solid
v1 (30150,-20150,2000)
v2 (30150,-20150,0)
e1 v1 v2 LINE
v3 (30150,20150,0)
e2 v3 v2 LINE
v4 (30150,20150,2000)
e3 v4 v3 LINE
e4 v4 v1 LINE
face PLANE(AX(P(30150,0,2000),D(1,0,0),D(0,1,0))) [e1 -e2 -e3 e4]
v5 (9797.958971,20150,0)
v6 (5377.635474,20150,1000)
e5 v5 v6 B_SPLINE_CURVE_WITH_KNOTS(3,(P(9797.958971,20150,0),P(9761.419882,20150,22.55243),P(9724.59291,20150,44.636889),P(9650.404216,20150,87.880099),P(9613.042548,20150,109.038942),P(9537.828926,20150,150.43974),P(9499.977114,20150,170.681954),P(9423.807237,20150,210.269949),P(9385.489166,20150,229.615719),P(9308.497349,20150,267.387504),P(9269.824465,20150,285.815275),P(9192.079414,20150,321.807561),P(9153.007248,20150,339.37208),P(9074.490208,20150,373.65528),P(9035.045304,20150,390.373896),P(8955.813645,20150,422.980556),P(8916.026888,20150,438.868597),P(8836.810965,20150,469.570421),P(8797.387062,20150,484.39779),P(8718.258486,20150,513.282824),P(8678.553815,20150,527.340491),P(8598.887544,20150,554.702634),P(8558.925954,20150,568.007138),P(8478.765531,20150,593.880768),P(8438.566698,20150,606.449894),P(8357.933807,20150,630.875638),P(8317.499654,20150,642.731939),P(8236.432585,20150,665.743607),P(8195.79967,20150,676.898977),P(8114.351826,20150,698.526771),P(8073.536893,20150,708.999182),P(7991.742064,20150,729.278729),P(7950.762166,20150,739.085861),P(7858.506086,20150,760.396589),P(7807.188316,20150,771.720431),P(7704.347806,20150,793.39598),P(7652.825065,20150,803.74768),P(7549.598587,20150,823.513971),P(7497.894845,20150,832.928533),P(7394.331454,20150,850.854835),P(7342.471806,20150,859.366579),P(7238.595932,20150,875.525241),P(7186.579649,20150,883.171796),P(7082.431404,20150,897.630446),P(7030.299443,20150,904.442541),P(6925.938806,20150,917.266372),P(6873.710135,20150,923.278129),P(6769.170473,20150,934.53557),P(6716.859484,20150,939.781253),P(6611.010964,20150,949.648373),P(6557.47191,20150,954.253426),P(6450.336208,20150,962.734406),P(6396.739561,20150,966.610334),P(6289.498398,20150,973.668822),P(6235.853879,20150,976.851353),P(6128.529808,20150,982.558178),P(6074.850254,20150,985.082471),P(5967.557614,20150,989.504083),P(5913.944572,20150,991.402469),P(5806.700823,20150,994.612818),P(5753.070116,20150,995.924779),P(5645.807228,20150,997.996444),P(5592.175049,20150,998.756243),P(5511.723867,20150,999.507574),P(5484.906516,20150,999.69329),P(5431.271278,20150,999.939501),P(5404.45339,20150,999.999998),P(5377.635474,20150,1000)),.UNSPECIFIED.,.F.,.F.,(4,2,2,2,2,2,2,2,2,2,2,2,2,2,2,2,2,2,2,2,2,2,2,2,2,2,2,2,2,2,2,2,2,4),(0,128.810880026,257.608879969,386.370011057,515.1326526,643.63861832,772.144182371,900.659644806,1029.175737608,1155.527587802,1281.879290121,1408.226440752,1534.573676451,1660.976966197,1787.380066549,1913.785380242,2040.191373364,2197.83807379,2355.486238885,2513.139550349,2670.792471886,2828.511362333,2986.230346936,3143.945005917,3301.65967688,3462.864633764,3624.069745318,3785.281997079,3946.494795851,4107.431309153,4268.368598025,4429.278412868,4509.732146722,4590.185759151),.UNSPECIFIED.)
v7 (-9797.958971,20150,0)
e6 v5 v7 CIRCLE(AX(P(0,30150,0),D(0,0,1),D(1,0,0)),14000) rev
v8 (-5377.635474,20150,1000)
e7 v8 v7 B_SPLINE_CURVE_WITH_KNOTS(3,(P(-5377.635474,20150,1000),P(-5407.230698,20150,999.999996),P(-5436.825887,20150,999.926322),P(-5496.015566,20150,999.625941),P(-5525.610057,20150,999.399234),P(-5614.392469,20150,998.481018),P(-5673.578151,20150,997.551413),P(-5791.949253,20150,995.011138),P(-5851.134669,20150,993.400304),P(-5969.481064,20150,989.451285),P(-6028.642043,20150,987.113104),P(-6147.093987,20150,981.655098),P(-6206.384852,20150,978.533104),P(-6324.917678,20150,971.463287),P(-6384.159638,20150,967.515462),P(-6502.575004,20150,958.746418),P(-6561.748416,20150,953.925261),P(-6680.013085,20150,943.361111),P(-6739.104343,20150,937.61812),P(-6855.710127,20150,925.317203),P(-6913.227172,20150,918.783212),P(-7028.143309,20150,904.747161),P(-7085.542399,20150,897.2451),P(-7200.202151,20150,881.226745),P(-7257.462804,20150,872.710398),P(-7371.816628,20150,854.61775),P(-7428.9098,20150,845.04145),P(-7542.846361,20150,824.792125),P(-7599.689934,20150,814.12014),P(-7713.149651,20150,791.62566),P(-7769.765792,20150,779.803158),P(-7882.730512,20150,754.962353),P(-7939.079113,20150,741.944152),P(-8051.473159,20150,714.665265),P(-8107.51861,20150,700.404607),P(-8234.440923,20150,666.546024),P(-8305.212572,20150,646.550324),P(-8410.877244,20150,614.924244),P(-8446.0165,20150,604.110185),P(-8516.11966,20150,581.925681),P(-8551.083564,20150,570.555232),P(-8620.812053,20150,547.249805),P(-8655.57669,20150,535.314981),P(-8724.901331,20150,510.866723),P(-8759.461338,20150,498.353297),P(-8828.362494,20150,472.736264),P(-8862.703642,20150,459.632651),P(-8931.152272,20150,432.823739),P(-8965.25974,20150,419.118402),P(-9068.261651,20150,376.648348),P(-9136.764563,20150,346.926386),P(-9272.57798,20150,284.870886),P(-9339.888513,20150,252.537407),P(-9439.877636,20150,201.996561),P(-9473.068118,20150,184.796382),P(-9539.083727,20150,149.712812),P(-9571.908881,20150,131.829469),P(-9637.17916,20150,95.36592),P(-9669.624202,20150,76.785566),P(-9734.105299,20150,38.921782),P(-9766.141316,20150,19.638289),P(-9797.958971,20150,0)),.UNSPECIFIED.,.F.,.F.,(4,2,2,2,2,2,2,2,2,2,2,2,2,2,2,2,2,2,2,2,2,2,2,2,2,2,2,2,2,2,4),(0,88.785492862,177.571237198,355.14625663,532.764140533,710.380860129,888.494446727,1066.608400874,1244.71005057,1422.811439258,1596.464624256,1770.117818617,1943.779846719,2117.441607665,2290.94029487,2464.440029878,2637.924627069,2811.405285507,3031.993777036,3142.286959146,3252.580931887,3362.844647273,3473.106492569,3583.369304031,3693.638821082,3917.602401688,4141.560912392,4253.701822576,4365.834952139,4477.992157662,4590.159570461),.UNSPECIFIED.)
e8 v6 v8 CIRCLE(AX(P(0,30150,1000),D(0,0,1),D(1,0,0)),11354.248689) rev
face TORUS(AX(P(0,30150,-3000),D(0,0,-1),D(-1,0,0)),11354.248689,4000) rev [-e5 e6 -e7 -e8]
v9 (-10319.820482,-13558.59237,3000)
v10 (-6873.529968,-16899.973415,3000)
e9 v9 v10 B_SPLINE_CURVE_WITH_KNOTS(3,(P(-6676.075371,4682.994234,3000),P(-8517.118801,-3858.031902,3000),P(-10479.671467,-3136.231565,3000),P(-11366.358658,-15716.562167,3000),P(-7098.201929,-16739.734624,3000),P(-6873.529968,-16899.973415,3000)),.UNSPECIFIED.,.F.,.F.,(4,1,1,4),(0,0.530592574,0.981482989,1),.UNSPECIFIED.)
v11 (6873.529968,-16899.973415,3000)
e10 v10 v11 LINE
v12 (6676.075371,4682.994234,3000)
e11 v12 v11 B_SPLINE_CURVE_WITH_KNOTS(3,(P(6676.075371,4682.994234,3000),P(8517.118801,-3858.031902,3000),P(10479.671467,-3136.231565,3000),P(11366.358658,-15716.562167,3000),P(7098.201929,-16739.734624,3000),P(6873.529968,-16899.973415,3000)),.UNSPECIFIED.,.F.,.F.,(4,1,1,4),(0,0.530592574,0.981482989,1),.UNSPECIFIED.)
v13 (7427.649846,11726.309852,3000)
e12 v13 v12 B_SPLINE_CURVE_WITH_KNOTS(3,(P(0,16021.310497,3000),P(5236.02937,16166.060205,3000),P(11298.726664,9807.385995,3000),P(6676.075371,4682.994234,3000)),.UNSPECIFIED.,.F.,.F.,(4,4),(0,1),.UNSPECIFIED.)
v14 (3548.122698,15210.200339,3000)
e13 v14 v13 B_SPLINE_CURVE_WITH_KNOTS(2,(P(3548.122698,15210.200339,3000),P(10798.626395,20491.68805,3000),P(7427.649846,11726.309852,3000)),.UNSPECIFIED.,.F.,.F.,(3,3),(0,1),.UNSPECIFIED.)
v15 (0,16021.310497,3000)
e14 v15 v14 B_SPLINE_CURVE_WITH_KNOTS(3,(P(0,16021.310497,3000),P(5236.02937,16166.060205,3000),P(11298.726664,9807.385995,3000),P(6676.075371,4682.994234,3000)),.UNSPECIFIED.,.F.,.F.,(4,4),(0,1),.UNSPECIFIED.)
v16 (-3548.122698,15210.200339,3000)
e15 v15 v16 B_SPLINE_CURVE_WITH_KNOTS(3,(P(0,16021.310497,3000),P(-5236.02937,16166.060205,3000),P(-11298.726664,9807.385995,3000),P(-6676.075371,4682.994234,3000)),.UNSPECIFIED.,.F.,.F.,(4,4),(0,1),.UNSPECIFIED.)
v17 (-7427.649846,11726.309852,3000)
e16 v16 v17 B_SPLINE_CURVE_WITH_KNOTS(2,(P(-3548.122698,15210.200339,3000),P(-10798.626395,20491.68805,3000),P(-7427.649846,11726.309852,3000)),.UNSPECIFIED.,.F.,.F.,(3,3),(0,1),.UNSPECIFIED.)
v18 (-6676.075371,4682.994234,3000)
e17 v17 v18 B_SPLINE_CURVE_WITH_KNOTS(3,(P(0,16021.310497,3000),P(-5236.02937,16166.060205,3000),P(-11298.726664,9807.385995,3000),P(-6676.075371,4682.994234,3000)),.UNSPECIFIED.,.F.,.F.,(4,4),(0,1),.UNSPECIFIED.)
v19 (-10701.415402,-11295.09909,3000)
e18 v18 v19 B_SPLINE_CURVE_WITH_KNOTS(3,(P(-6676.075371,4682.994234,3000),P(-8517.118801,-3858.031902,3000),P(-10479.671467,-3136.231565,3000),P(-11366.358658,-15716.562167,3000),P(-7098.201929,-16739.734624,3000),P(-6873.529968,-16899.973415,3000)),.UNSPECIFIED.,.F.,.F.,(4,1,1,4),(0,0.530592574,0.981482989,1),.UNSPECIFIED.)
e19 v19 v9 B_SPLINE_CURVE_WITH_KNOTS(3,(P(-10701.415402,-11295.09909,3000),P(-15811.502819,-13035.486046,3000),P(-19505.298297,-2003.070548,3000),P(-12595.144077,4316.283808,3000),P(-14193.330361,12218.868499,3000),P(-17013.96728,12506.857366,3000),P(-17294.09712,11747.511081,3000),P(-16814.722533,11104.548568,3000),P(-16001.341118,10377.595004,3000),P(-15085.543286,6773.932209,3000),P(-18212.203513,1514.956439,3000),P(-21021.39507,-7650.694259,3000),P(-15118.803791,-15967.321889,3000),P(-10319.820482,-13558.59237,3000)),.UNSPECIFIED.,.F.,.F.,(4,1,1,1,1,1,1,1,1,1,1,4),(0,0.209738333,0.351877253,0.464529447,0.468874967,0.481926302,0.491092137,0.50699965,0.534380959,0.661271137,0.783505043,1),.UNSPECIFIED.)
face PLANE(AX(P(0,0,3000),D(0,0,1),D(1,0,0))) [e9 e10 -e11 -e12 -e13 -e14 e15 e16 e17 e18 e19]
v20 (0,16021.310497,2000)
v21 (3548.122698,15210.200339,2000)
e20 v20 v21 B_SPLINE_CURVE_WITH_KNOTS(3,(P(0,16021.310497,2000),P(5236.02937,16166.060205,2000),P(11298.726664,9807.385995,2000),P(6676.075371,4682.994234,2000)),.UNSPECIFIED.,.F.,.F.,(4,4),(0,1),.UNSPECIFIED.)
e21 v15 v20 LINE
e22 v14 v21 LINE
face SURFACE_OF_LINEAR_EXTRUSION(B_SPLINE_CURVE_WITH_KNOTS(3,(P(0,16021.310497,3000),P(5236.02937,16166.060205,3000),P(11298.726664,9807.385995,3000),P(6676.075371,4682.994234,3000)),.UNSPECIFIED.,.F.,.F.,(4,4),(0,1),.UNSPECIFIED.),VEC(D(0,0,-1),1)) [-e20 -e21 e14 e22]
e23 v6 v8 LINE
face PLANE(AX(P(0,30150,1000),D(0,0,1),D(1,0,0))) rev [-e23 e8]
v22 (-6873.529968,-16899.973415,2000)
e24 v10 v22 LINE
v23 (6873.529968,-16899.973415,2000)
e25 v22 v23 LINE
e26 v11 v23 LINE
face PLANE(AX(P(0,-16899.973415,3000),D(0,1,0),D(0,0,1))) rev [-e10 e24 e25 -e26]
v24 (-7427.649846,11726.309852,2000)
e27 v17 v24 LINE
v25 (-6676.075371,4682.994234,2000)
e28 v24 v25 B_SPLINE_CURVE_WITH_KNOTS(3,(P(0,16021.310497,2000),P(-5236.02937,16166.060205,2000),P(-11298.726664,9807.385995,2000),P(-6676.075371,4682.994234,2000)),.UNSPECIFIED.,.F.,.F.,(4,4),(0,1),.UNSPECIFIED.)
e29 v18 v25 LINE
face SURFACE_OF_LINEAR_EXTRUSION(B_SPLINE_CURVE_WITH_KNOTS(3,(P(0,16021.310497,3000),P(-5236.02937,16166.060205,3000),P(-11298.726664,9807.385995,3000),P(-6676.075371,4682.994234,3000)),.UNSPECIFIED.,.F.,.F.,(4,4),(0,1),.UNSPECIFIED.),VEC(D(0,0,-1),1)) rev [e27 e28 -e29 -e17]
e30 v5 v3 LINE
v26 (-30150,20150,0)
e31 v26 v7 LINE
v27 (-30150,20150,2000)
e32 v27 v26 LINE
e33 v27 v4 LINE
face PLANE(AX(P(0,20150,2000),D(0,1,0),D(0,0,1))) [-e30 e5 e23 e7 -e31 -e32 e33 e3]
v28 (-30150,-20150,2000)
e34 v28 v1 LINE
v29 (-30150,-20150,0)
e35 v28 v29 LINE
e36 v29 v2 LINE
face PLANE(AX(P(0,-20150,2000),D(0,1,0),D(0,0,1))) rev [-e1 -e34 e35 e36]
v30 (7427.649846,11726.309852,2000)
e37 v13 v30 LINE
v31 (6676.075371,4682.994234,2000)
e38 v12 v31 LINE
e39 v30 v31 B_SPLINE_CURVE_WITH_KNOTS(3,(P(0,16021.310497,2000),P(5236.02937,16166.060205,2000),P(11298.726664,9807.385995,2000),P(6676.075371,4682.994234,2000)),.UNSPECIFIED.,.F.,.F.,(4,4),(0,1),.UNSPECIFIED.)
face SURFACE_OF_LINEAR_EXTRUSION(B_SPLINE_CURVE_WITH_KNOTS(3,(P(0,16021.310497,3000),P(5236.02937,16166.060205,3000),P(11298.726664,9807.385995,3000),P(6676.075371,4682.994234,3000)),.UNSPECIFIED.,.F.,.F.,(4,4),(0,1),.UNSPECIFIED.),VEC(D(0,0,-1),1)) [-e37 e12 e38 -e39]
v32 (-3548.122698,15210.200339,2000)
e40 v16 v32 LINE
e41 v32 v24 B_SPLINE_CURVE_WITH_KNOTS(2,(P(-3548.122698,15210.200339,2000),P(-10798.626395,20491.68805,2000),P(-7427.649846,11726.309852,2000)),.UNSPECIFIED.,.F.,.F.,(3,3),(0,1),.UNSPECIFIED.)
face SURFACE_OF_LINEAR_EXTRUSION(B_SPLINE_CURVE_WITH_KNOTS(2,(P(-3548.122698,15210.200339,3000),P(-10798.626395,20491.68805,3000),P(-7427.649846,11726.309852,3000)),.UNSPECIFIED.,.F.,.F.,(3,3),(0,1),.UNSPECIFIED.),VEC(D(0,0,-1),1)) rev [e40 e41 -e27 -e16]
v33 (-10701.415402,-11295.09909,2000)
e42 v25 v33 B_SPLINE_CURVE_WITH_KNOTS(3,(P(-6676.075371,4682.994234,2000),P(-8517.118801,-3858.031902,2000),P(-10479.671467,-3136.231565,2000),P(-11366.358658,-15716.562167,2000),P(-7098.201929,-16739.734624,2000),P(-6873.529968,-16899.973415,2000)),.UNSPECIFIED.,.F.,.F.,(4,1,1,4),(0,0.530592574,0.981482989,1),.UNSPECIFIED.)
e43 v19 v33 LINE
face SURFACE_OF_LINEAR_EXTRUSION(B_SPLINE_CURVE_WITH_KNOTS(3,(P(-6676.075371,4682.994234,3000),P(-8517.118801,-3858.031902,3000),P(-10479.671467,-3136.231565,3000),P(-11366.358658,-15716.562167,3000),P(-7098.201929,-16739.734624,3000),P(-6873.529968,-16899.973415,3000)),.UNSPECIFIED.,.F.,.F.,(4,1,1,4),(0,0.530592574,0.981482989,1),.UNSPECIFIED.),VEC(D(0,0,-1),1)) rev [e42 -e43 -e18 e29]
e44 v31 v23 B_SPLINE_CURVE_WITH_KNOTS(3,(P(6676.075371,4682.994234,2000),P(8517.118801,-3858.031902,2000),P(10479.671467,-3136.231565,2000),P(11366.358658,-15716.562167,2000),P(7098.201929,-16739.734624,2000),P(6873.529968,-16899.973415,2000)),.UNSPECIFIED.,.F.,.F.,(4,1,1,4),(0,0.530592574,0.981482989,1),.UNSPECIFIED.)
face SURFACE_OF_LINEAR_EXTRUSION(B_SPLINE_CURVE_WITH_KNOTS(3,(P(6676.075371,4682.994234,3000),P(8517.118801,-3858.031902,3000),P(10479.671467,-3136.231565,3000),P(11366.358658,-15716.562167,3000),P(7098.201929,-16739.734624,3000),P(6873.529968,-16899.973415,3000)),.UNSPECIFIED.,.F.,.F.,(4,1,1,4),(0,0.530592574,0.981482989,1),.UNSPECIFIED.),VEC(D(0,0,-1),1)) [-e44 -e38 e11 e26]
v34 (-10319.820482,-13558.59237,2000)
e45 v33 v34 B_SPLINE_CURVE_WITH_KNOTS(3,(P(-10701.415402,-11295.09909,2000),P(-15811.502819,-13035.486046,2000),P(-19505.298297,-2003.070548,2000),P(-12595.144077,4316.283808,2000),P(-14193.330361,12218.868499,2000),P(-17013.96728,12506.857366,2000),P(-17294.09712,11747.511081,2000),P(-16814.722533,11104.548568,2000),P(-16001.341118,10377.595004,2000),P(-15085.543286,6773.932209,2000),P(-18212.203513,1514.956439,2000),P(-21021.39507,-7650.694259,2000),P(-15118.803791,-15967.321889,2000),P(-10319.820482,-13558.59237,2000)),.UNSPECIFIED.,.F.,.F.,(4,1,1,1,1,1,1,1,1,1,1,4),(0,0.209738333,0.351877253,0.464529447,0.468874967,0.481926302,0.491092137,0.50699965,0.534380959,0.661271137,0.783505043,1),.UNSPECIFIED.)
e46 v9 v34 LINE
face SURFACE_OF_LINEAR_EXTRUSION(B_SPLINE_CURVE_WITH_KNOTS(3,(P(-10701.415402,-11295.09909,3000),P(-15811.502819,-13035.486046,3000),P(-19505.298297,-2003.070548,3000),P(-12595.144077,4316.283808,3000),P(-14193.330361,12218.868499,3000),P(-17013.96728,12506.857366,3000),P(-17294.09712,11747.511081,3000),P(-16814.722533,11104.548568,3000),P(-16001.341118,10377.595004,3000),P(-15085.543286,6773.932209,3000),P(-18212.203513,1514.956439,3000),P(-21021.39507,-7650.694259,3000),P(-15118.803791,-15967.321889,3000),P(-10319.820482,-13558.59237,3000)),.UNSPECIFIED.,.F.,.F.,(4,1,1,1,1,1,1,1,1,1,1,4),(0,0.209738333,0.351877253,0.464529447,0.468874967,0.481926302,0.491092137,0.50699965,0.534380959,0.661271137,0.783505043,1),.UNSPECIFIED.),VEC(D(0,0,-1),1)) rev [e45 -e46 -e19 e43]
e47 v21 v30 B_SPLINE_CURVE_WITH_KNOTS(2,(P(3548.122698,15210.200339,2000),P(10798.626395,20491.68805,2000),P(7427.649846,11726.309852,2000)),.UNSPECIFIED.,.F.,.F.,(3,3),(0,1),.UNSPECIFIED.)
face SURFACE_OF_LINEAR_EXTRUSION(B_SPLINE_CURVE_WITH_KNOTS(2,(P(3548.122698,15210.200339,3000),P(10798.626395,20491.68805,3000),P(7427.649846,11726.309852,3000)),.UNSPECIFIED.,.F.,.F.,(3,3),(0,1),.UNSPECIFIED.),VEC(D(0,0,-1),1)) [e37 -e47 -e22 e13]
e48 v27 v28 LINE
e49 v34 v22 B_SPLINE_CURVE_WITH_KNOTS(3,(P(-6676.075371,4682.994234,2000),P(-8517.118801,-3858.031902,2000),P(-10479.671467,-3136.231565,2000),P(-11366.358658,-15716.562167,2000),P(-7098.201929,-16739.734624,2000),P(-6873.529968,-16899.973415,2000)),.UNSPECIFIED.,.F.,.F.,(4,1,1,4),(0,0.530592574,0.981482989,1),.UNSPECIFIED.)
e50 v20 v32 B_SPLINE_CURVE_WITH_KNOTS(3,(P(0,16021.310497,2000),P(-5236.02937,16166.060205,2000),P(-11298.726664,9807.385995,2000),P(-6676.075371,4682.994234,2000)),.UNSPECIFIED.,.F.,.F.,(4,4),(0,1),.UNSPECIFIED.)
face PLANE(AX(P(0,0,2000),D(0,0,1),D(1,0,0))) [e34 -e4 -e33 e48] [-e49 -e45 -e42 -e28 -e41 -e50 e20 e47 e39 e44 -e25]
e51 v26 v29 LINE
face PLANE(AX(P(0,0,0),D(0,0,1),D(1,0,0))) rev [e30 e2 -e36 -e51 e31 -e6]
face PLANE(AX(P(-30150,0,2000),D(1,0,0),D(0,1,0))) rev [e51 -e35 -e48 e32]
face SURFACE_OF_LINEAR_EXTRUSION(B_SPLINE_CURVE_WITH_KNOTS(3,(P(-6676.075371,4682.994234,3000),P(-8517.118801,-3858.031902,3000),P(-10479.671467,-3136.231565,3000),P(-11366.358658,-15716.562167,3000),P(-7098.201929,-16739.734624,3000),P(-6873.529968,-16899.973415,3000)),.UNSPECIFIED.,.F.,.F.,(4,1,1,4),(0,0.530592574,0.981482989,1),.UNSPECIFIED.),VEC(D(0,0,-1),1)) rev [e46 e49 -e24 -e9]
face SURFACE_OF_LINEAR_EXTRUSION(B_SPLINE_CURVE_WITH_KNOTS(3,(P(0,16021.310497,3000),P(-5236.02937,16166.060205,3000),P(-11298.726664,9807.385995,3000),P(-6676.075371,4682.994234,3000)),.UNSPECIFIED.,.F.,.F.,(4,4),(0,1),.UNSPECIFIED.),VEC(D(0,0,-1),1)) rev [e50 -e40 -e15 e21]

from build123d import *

# Parameters (mm, degrees)
MAINPLATE_DEPTH     = 2000
NOTCH_START         = 1000
NOTCH_DEPTH         = 1000
NOTCHFILLET_R       = 4000
BOSS_EXTRUDE1_DEPTH = 1000


with BuildPart() as part:
    # Sketch1 → MainPlate (new body)
    with BuildSketch(Plane.XY):
        with BuildLine():
            Line((-9797.958971133, 20150), (-30150, 20150))
            Line((-30150, 20150), (-30150, -20150))
            Line((-30150, -20150), (30150, -20150))
            Line((30150, -20150), (30150, 20150))
            Line((30150, 20150), (9797.958971133, 20150))
            ThreePointArc((9797.958971133, 20150), (0, 16150), (-9797.958971133, 20150))
        make_face()
    extrude(amount=MAINPLATE_DEPTH)

    # Sketch1<3> → Notch (add)
    with BuildSketch(Plane.XY.offset(NOTCH_START)):
        with BuildLine():
            Line((9797.958971133, 20150), (-9797.958971133, 20150))
            ThreePointArc((-9797.958971133, 20150), (0, 16150), (9797.958971133, 20150))
        make_face()
    extrude(amount=NOTCH_DEPTH)

    # NotchFillet
    # the kernel refuses this fillet: 4000 mm, written as the material it adds along each edge
    with BuildSketch(Plane(origin=(0, 30150, 1000), x_dir=(-0.9482993587700965, -0.3173772615614165, 0), z_dir=(-0.3173772615614165, 0.9482993587700965, 0))) as notchfillet_piece_1_section:
        with BuildLine():
            CenterArc((11354.248688935, -4000), NOTCHFILLET_R, 48.590377891, 41.409622109)
            Line((11354.248688935, 0), (11354.248688935, 80))
            Line((11354.248688935, 80), (14000, 80))
            Line((14000, 80), (14080, 0))
            ThreePointArc((14080, 0), (14080, -500), (14052.915026221, -940))
            Line((14052.915026221, -940), (14000, -1000))
        make_face()
    notchfillet_piece_1 = revolve(axis=Axis((0, 30150, 1000), (0, 0, 1)), revolution_arc=142.991226577, mode=Mode.PRIVATE)
    notchfillet_piece_1 = split(notchfillet_piece_1, bisect_by=Plane(origin=(0, 20150, 767.581558225), z_dir=(0, -1, 0)), keep=Keep.TOP, mode=Mode.PRIVATE)
    add(notchfillet_piece_1)

    # Sketch2 → Boss-Extrude1 (add)
    with BuildSketch(Plane.XY.offset(2000)):
        with BuildLine():
            add(Edge.make_bspline(
                [(-10701.415402451, -11295.099090351), (-15811.502818911, -13035.48604603), (-19505.298297344, -2003.070548065), (-12595.144077247, 4316.28380771), (-14193.330361108, 12218.868499182), (-17013.967280119, 12506.857365661), (-17294.09711996, 11747.511080652), (-16814.72253338, 11104.548568177), (-16001.341117572, 10377.595003792), (-15085.54328611, 6773.932209018), (-18212.203512754, 1514.956439448), (-21021.395070297, -7650.694259071), (-15118.803791461, -15967.321888991), (-10319.820482304, -13558.592370043)],
                knots=[0, 0, 0, 0, 0.209738333, 0.351877253, 0.464529447, 0.468874967, 0.481926302, 0.491092137, 0.50699965, 0.534380959, 0.661271137, 0.783505043, 1, 1, 1, 1], degree=3))
            add(Edge.make_bspline(
                [(-10701.415402451, -11295.099090351), (-10657.682935176, -12074.807448423), (-10540.914694203, -12847.81911371), (-10319.820482304, -13558.592370043)],
                knots=[0.712539323, 0.712539323, 0.712539323, 0.712539323, 0.801372914, 0.801372914, 0.801372914, 0.801372914], degree=3))
        make_face()
        with BuildLine():
            Line((0, -16899.973414605), (0, 16021.310496988))
            add(Edge.make_bspline(
                [(0, 16021.310496988), (-1184.841242541, 16054.065359953), (-2412.012387281, 15753.809481573), (-3548.122697587, 15210.200338564)],
                knots=[0, 0, 0, 0, 0.22628621, 0.22628621, 0.22628621, 0.22628621], degree=3))
            add(Edge.make_bspline(
                [(-3548.122697587, 15210.200338564), (-5144.389097299, 14446.414461707), (-6560.892058077, 13202.224248588), (-7427.649845507, 11726.309851782)],
                knots=[0.22628621, 0.22628621, 0.22628621, 0.22628621, 0.544224592, 0.544224592, 0.544224592, 0.544224592], degree=3))
            add(Edge.make_bspline(
                [(-7427.649845507, 11726.309851782), (-8670.176403991, 9610.536722684), (-8782.966148127, 7018.565977353), (-6676.075371015, 4682.994233731)],
                knots=[0.544224592, 0.544224592, 0.544224592, 0.544224592, 1, 1, 1, 1], degree=3))
            add(Edge.make_bspline(
                [(-6676.075371015, 4682.994233731), (-8517.118800664, -3858.031901679), (-9941.897389924, -3334.017600063), (-10790.987152988, -9698.119846038), (-10701.415402451, -11295.099090351)],
                knots=[0, 0, 0, 0, 0.530592574, 0.712539323, 0.712539323, 0.712539323, 0.712539323], degree=3))
            add(Edge.make_bspline(
                [(-10701.415402451, -11295.099090351), (-10657.682935176, -12074.807448423), (-10540.914694203, -12847.81911371), (-10319.820482304, -13558.592370043)],
                knots=[0.712539323, 0.712539323, 0.712539323, 0.712539323, 0.801372914, 0.801372914, 0.801372914, 0.801372914], degree=3))
            add(Edge.make_bspline(
                [(-10319.820482304, -13558.592370043), (-9871.552043124, -14999.684904718), (-8904.248206782, -16306.785010118), (-7098.201928611, -16739.734624268), (-6873.52996804, -16899.973414605)],
                knots=[0.801372914, 0.801372914, 0.801372914, 0.801372914, 0.981482989, 1, 1, 1, 1], degree=3))
            Line((-6873.52996804, -16899.973414605), (0, -16899.973414605))
        make_face()
        with BuildLine():
            add(Edge.make_bspline(
                [(0, 16021.310496988), (1184.841242541, 16054.065359953), (2412.012387281, 15753.809481573), (3548.122697587, 15210.200338564)],
                knots=[0, 0, 0, 0, 0.22628621, 0.22628621, 0.22628621, 0.22628621], degree=3))
            Line((0, 16021.310496988), (0, -16899.973414605))
            Line((0, -16899.973414605), (6873.52996804, -16899.973414605))
            add(Edge.make_bspline(
                [(6676.075371015, 4682.994233731), (8517.118800664, -3858.031901679), (10479.671466803, -3136.231565485), (11366.358658066, -15716.562166573), (7098.201928611, -16739.734624268), (6873.52996804, -16899.973414605)],
                knots=[0, 0, 0, 0, 0.530592574, 0.981482989, 1, 1, 1, 1], degree=3))
            add(Edge.make_bspline(
                [(7427.649845507, 11726.309851782), (8670.176403991, 9610.536722684), (8782.966148127, 7018.565977353), (6676.075371015, 4682.994233731)],
                knots=[0.544224592, 0.544224592, 0.544224592, 0.544224592, 1, 1, 1, 1], degree=3))
            add(Edge.make_bspline(
                [(3548.122697587, 15210.200338564), (5144.389097299, 14446.414461707), (6560.892058077, 13202.224248588), (7427.649845507, 11726.309851782)],
                knots=[0.22628621, 0.22628621, 0.22628621, 0.22628621, 0.544224592, 0.544224592, 0.544224592, 0.544224592], degree=3))
        make_face()
        with BuildLine():
            add(Edge.make_bspline(
                [(3548.122697587, 15210.200338564), (10798.626394755, 20491.68805006), (7427.649845507, 11726.309851782)],
                knots=[0, 0, 0, 1, 1, 1], degree=2))
            add(Edge.make_bspline(
                [(3548.122697587, 15210.200338564), (5144.389097299, 14446.414461707), (6560.892058077, 13202.224248588), (7427.649845507, 11726.309851782)],
                knots=[0.22628621, 0.22628621, 0.22628621, 0.22628621, 0.544224592, 0.544224592, 0.544224592, 0.544224592], degree=3))
        make_face()
        with BuildLine():
            add(Edge.make_bspline(
                [(-3548.122697587, 15210.200338564), (-5144.389097299, 14446.414461707), (-6560.892058077, 13202.224248588), (-7427.649845507, 11726.309851782)],
                knots=[0.22628621, 0.22628621, 0.22628621, 0.22628621, 0.544224592, 0.544224592, 0.544224592, 0.544224592], degree=3))
            add(Edge.make_bspline(
                [(-3548.122697587, 15210.200338564), (-10798.626394755, 20491.68805006), (-7427.649845507, 11726.309851782)],
                knots=[0, 0, 0, 1, 1, 1], degree=2))
        make_face()
    extrude(amount=BOSS_EXTRUDE1_DEPTH)


solid = part.part
